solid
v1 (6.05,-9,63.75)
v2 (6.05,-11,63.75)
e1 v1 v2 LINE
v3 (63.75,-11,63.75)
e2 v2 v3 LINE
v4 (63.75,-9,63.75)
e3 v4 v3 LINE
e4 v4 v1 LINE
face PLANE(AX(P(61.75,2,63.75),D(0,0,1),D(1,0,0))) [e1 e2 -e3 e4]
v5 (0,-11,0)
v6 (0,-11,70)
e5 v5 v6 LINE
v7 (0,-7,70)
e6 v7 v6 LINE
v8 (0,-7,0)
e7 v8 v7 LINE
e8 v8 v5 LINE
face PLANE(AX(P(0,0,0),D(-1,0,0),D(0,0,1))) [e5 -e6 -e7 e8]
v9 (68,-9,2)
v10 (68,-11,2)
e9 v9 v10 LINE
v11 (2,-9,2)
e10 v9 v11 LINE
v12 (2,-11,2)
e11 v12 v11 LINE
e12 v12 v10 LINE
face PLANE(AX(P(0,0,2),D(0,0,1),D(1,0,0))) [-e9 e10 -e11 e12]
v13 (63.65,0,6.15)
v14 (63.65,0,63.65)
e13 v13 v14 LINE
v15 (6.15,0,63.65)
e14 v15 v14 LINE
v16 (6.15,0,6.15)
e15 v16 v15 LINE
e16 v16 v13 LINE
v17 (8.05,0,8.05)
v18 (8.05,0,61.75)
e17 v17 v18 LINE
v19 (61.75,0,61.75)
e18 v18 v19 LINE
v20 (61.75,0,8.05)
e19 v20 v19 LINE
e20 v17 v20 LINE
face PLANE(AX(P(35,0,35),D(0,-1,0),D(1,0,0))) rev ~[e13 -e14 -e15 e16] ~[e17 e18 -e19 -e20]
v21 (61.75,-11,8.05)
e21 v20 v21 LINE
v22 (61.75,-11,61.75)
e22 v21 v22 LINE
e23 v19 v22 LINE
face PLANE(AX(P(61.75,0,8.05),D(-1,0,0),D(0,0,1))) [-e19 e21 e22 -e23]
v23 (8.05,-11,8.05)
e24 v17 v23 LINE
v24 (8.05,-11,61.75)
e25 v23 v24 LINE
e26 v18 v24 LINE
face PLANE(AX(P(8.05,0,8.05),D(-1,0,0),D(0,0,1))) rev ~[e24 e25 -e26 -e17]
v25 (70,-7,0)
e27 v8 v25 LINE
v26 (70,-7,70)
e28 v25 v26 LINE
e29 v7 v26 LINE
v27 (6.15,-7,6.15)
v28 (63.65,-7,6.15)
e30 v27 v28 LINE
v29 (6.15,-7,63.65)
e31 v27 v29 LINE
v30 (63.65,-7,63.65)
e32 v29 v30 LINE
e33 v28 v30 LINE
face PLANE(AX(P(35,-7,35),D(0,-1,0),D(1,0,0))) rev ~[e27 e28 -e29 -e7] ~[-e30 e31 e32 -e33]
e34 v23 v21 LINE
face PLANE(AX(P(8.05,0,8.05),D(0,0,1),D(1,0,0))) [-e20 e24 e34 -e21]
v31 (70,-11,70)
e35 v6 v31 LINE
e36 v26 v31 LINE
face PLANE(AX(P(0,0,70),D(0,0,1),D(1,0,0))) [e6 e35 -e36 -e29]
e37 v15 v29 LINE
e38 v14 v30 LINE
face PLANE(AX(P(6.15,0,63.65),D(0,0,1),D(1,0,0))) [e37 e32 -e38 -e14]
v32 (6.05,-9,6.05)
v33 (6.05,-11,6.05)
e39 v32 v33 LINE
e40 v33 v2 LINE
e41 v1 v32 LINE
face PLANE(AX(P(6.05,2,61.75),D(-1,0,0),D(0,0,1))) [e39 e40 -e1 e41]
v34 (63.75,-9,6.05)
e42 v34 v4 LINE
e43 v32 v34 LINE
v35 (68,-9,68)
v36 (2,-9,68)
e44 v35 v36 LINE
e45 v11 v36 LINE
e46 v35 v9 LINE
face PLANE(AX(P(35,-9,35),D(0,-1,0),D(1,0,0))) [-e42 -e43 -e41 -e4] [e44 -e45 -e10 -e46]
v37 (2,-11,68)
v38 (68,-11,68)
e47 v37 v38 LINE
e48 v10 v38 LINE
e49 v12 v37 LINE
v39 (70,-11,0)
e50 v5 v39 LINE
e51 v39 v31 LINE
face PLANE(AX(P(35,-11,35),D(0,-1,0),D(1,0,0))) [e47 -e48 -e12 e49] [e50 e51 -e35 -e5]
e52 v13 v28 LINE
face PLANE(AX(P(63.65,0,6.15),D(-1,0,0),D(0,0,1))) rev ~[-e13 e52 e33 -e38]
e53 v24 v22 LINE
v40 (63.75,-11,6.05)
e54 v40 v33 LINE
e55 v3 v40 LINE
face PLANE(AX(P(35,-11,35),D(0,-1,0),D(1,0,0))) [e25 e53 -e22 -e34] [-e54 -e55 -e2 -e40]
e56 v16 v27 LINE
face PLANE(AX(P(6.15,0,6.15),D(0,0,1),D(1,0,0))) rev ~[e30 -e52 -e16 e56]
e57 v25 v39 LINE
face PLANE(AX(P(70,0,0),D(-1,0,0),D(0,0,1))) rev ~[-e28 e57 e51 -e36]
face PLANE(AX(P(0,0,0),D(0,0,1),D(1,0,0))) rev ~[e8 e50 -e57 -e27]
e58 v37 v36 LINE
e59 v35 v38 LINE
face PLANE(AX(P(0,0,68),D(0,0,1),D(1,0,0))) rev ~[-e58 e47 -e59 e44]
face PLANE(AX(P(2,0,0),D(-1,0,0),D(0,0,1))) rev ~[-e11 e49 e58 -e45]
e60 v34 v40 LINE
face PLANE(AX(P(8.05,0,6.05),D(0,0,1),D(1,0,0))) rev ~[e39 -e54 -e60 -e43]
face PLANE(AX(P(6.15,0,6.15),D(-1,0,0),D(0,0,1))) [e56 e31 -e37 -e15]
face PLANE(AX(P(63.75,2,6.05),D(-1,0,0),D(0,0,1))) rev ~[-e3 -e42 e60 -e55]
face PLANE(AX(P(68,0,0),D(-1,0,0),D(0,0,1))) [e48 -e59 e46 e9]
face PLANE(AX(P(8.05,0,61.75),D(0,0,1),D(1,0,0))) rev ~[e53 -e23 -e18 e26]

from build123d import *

# Parameters (mm, degrees)
F0_W        = 70
F0_H        = 70
F0_W_2      = 64.5
F0_H_2      = 64.5
F0_W_3      = 57.5
F0_H_3      = 57.5
F0_W_4      = 53.7
F0_H_4      = 53.7
F1_DEPTH    = 11
F2_DEPTH    = 7
F3_T        = 2
F3_T3_DEPTH = 61.5
F3_T5_DEPTH = 61.5
F3_T7_DEPTH = 15


# Not quite as in the source:
# - a shell that OpenCascade refuses in one call is made with other operations: the cavity is built on its own and cut out


with BuildPart() as f1:
    # F0 (on Front) → F1 (new body)
    with BuildSketch(Plane.XZ):
        with Locations((35, 35)):
            Rectangle(F0_W, F0_H)
        with Locations((35, 35)):
            Rectangle(F0_W_2, F0_H_2, mode=Mode.SUBTRACT)
        with Locations((35, 35)):
            Rectangle(F0_W_2, F0_H_2)
        with Locations((34.9, 34.9)):
            Rectangle(F0_W_3, F0_H_3, mode=Mode.SUBTRACT)
        with Locations((34.9, 34.9)):
            Rectangle(F0_W_3, F0_H_3)
        with Locations((34.9, 34.9)):
            Rectangle(F0_W_4, F0_H_4, mode=Mode.SUBTRACT)
    extrude(amount=F1_DEPTH)

    # F0 (on Front) → F2 (cut)
    with BuildSketch(Plane.XZ):
        with Locations((35, 35)):
            Rectangle(F0_W, F0_H)
        with Locations((35, 35)):
            Rectangle(F0_W_2, F0_H_2, mode=Mode.SUBTRACT)
        with Locations((35, 35)):
            Rectangle(F0_W_2, F0_H_2)
        with Locations((34.9, 34.9)):
            Rectangle(F0_W_3, F0_H_3, mode=Mode.SUBTRACT)
    extrude(amount=F2_DEPTH, mode=Mode.SUBTRACT)

    # F3: shell of thickness 2, made by hand


with BuildPart() as f3_core1:
    # F3_t2: copy of F1
    add(f1.part)

    # the walls: a layer under each face that stays
    f3_faces = [f3_core1.faces().sort_by_distance(p)[0] for p in [
        (0, -9, 35),
        (5, -7, 5),
        (35, -9, 0),
        (35, -9, 70),
        (70, -9, 35),
        (63.65, -3.5, 34.9),
        (34.9, -3.5, 6.15),
        (6.15, -3.5, 34.9),
        (34.9, -3.5, 63.65),
        (34.9, -5.5, 8.05),
        (8.05, -5.5, 34.9),
        (34.9, -5.5, 61.75),
        (61.75, -5.5, 34.9),
        (7.946875, 0, 40.2240740741),
    ]]
    thicken(f3_faces, amount=-F3_T, mode=Mode.SUBTRACT)

    # F3_s4 → F3_t3 (cut)
    with BuildSketch(Plane.XY.offset(4.15)):
        Polygon((63.67, -6.98), (63.65, -9), (61.65, -9), (61.65, -7), align=None)
        Polygon((6.13, -6.98), (6.15, -9), (8.15, -9), (8.15, -7), align=None)
    extrude(amount=F3_T3_DEPTH, mode=Mode.SUBTRACT)

    # F3_s6 → F3_t5 (cut)
    with BuildSketch(Plane.YZ.offset(4.15)):
        Polygon((-6.98, 6.13), (-9, 6.15), (-9, 8.15), (-7, 8.15), align=None)
        Polygon((-6.98, 63.67), (-9, 63.65), (-9, 61.65), (-7, 61.65), align=None)
    extrude(amount=F3_T5_DEPTH, mode=Mode.SUBTRACT)

    # F3_s8 → F3_t7 (cut)
    with BuildSketch(Plane.XZ.offset(-2)):
        Polygon((61.73, 8.07), (61.75, 6.05), (63.75, 6.05), (63.75, 8.05), align=None)
        Polygon((8.07, 8.07), (8.05, 6.05), (6.05, 6.05), (6.05, 8.05), align=None)
        Polygon((8.07, 61.73), (6.05, 61.75), (6.05, 63.75), (8.05, 63.75), align=None)
        Polygon((61.73, 61.73), (61.75, 63.75), (63.75, 63.75), (63.75, 61.75), align=None)
    extrude(amount=F3_T7_DEPTH, mode=Mode.SUBTRACT)


with BuildPart() as f1_1:
    add(f1.part)

    # what is left inside the walls is the cavity
    f3_cavity = [f3_core1.part.solids().sort_by_distance(p)[0] for p in [
        (39.125, -9.02, 4.444444),
    ]]
    add(f3_cavity, mode=Mode.SUBTRACT)


solid = f1_1.part
